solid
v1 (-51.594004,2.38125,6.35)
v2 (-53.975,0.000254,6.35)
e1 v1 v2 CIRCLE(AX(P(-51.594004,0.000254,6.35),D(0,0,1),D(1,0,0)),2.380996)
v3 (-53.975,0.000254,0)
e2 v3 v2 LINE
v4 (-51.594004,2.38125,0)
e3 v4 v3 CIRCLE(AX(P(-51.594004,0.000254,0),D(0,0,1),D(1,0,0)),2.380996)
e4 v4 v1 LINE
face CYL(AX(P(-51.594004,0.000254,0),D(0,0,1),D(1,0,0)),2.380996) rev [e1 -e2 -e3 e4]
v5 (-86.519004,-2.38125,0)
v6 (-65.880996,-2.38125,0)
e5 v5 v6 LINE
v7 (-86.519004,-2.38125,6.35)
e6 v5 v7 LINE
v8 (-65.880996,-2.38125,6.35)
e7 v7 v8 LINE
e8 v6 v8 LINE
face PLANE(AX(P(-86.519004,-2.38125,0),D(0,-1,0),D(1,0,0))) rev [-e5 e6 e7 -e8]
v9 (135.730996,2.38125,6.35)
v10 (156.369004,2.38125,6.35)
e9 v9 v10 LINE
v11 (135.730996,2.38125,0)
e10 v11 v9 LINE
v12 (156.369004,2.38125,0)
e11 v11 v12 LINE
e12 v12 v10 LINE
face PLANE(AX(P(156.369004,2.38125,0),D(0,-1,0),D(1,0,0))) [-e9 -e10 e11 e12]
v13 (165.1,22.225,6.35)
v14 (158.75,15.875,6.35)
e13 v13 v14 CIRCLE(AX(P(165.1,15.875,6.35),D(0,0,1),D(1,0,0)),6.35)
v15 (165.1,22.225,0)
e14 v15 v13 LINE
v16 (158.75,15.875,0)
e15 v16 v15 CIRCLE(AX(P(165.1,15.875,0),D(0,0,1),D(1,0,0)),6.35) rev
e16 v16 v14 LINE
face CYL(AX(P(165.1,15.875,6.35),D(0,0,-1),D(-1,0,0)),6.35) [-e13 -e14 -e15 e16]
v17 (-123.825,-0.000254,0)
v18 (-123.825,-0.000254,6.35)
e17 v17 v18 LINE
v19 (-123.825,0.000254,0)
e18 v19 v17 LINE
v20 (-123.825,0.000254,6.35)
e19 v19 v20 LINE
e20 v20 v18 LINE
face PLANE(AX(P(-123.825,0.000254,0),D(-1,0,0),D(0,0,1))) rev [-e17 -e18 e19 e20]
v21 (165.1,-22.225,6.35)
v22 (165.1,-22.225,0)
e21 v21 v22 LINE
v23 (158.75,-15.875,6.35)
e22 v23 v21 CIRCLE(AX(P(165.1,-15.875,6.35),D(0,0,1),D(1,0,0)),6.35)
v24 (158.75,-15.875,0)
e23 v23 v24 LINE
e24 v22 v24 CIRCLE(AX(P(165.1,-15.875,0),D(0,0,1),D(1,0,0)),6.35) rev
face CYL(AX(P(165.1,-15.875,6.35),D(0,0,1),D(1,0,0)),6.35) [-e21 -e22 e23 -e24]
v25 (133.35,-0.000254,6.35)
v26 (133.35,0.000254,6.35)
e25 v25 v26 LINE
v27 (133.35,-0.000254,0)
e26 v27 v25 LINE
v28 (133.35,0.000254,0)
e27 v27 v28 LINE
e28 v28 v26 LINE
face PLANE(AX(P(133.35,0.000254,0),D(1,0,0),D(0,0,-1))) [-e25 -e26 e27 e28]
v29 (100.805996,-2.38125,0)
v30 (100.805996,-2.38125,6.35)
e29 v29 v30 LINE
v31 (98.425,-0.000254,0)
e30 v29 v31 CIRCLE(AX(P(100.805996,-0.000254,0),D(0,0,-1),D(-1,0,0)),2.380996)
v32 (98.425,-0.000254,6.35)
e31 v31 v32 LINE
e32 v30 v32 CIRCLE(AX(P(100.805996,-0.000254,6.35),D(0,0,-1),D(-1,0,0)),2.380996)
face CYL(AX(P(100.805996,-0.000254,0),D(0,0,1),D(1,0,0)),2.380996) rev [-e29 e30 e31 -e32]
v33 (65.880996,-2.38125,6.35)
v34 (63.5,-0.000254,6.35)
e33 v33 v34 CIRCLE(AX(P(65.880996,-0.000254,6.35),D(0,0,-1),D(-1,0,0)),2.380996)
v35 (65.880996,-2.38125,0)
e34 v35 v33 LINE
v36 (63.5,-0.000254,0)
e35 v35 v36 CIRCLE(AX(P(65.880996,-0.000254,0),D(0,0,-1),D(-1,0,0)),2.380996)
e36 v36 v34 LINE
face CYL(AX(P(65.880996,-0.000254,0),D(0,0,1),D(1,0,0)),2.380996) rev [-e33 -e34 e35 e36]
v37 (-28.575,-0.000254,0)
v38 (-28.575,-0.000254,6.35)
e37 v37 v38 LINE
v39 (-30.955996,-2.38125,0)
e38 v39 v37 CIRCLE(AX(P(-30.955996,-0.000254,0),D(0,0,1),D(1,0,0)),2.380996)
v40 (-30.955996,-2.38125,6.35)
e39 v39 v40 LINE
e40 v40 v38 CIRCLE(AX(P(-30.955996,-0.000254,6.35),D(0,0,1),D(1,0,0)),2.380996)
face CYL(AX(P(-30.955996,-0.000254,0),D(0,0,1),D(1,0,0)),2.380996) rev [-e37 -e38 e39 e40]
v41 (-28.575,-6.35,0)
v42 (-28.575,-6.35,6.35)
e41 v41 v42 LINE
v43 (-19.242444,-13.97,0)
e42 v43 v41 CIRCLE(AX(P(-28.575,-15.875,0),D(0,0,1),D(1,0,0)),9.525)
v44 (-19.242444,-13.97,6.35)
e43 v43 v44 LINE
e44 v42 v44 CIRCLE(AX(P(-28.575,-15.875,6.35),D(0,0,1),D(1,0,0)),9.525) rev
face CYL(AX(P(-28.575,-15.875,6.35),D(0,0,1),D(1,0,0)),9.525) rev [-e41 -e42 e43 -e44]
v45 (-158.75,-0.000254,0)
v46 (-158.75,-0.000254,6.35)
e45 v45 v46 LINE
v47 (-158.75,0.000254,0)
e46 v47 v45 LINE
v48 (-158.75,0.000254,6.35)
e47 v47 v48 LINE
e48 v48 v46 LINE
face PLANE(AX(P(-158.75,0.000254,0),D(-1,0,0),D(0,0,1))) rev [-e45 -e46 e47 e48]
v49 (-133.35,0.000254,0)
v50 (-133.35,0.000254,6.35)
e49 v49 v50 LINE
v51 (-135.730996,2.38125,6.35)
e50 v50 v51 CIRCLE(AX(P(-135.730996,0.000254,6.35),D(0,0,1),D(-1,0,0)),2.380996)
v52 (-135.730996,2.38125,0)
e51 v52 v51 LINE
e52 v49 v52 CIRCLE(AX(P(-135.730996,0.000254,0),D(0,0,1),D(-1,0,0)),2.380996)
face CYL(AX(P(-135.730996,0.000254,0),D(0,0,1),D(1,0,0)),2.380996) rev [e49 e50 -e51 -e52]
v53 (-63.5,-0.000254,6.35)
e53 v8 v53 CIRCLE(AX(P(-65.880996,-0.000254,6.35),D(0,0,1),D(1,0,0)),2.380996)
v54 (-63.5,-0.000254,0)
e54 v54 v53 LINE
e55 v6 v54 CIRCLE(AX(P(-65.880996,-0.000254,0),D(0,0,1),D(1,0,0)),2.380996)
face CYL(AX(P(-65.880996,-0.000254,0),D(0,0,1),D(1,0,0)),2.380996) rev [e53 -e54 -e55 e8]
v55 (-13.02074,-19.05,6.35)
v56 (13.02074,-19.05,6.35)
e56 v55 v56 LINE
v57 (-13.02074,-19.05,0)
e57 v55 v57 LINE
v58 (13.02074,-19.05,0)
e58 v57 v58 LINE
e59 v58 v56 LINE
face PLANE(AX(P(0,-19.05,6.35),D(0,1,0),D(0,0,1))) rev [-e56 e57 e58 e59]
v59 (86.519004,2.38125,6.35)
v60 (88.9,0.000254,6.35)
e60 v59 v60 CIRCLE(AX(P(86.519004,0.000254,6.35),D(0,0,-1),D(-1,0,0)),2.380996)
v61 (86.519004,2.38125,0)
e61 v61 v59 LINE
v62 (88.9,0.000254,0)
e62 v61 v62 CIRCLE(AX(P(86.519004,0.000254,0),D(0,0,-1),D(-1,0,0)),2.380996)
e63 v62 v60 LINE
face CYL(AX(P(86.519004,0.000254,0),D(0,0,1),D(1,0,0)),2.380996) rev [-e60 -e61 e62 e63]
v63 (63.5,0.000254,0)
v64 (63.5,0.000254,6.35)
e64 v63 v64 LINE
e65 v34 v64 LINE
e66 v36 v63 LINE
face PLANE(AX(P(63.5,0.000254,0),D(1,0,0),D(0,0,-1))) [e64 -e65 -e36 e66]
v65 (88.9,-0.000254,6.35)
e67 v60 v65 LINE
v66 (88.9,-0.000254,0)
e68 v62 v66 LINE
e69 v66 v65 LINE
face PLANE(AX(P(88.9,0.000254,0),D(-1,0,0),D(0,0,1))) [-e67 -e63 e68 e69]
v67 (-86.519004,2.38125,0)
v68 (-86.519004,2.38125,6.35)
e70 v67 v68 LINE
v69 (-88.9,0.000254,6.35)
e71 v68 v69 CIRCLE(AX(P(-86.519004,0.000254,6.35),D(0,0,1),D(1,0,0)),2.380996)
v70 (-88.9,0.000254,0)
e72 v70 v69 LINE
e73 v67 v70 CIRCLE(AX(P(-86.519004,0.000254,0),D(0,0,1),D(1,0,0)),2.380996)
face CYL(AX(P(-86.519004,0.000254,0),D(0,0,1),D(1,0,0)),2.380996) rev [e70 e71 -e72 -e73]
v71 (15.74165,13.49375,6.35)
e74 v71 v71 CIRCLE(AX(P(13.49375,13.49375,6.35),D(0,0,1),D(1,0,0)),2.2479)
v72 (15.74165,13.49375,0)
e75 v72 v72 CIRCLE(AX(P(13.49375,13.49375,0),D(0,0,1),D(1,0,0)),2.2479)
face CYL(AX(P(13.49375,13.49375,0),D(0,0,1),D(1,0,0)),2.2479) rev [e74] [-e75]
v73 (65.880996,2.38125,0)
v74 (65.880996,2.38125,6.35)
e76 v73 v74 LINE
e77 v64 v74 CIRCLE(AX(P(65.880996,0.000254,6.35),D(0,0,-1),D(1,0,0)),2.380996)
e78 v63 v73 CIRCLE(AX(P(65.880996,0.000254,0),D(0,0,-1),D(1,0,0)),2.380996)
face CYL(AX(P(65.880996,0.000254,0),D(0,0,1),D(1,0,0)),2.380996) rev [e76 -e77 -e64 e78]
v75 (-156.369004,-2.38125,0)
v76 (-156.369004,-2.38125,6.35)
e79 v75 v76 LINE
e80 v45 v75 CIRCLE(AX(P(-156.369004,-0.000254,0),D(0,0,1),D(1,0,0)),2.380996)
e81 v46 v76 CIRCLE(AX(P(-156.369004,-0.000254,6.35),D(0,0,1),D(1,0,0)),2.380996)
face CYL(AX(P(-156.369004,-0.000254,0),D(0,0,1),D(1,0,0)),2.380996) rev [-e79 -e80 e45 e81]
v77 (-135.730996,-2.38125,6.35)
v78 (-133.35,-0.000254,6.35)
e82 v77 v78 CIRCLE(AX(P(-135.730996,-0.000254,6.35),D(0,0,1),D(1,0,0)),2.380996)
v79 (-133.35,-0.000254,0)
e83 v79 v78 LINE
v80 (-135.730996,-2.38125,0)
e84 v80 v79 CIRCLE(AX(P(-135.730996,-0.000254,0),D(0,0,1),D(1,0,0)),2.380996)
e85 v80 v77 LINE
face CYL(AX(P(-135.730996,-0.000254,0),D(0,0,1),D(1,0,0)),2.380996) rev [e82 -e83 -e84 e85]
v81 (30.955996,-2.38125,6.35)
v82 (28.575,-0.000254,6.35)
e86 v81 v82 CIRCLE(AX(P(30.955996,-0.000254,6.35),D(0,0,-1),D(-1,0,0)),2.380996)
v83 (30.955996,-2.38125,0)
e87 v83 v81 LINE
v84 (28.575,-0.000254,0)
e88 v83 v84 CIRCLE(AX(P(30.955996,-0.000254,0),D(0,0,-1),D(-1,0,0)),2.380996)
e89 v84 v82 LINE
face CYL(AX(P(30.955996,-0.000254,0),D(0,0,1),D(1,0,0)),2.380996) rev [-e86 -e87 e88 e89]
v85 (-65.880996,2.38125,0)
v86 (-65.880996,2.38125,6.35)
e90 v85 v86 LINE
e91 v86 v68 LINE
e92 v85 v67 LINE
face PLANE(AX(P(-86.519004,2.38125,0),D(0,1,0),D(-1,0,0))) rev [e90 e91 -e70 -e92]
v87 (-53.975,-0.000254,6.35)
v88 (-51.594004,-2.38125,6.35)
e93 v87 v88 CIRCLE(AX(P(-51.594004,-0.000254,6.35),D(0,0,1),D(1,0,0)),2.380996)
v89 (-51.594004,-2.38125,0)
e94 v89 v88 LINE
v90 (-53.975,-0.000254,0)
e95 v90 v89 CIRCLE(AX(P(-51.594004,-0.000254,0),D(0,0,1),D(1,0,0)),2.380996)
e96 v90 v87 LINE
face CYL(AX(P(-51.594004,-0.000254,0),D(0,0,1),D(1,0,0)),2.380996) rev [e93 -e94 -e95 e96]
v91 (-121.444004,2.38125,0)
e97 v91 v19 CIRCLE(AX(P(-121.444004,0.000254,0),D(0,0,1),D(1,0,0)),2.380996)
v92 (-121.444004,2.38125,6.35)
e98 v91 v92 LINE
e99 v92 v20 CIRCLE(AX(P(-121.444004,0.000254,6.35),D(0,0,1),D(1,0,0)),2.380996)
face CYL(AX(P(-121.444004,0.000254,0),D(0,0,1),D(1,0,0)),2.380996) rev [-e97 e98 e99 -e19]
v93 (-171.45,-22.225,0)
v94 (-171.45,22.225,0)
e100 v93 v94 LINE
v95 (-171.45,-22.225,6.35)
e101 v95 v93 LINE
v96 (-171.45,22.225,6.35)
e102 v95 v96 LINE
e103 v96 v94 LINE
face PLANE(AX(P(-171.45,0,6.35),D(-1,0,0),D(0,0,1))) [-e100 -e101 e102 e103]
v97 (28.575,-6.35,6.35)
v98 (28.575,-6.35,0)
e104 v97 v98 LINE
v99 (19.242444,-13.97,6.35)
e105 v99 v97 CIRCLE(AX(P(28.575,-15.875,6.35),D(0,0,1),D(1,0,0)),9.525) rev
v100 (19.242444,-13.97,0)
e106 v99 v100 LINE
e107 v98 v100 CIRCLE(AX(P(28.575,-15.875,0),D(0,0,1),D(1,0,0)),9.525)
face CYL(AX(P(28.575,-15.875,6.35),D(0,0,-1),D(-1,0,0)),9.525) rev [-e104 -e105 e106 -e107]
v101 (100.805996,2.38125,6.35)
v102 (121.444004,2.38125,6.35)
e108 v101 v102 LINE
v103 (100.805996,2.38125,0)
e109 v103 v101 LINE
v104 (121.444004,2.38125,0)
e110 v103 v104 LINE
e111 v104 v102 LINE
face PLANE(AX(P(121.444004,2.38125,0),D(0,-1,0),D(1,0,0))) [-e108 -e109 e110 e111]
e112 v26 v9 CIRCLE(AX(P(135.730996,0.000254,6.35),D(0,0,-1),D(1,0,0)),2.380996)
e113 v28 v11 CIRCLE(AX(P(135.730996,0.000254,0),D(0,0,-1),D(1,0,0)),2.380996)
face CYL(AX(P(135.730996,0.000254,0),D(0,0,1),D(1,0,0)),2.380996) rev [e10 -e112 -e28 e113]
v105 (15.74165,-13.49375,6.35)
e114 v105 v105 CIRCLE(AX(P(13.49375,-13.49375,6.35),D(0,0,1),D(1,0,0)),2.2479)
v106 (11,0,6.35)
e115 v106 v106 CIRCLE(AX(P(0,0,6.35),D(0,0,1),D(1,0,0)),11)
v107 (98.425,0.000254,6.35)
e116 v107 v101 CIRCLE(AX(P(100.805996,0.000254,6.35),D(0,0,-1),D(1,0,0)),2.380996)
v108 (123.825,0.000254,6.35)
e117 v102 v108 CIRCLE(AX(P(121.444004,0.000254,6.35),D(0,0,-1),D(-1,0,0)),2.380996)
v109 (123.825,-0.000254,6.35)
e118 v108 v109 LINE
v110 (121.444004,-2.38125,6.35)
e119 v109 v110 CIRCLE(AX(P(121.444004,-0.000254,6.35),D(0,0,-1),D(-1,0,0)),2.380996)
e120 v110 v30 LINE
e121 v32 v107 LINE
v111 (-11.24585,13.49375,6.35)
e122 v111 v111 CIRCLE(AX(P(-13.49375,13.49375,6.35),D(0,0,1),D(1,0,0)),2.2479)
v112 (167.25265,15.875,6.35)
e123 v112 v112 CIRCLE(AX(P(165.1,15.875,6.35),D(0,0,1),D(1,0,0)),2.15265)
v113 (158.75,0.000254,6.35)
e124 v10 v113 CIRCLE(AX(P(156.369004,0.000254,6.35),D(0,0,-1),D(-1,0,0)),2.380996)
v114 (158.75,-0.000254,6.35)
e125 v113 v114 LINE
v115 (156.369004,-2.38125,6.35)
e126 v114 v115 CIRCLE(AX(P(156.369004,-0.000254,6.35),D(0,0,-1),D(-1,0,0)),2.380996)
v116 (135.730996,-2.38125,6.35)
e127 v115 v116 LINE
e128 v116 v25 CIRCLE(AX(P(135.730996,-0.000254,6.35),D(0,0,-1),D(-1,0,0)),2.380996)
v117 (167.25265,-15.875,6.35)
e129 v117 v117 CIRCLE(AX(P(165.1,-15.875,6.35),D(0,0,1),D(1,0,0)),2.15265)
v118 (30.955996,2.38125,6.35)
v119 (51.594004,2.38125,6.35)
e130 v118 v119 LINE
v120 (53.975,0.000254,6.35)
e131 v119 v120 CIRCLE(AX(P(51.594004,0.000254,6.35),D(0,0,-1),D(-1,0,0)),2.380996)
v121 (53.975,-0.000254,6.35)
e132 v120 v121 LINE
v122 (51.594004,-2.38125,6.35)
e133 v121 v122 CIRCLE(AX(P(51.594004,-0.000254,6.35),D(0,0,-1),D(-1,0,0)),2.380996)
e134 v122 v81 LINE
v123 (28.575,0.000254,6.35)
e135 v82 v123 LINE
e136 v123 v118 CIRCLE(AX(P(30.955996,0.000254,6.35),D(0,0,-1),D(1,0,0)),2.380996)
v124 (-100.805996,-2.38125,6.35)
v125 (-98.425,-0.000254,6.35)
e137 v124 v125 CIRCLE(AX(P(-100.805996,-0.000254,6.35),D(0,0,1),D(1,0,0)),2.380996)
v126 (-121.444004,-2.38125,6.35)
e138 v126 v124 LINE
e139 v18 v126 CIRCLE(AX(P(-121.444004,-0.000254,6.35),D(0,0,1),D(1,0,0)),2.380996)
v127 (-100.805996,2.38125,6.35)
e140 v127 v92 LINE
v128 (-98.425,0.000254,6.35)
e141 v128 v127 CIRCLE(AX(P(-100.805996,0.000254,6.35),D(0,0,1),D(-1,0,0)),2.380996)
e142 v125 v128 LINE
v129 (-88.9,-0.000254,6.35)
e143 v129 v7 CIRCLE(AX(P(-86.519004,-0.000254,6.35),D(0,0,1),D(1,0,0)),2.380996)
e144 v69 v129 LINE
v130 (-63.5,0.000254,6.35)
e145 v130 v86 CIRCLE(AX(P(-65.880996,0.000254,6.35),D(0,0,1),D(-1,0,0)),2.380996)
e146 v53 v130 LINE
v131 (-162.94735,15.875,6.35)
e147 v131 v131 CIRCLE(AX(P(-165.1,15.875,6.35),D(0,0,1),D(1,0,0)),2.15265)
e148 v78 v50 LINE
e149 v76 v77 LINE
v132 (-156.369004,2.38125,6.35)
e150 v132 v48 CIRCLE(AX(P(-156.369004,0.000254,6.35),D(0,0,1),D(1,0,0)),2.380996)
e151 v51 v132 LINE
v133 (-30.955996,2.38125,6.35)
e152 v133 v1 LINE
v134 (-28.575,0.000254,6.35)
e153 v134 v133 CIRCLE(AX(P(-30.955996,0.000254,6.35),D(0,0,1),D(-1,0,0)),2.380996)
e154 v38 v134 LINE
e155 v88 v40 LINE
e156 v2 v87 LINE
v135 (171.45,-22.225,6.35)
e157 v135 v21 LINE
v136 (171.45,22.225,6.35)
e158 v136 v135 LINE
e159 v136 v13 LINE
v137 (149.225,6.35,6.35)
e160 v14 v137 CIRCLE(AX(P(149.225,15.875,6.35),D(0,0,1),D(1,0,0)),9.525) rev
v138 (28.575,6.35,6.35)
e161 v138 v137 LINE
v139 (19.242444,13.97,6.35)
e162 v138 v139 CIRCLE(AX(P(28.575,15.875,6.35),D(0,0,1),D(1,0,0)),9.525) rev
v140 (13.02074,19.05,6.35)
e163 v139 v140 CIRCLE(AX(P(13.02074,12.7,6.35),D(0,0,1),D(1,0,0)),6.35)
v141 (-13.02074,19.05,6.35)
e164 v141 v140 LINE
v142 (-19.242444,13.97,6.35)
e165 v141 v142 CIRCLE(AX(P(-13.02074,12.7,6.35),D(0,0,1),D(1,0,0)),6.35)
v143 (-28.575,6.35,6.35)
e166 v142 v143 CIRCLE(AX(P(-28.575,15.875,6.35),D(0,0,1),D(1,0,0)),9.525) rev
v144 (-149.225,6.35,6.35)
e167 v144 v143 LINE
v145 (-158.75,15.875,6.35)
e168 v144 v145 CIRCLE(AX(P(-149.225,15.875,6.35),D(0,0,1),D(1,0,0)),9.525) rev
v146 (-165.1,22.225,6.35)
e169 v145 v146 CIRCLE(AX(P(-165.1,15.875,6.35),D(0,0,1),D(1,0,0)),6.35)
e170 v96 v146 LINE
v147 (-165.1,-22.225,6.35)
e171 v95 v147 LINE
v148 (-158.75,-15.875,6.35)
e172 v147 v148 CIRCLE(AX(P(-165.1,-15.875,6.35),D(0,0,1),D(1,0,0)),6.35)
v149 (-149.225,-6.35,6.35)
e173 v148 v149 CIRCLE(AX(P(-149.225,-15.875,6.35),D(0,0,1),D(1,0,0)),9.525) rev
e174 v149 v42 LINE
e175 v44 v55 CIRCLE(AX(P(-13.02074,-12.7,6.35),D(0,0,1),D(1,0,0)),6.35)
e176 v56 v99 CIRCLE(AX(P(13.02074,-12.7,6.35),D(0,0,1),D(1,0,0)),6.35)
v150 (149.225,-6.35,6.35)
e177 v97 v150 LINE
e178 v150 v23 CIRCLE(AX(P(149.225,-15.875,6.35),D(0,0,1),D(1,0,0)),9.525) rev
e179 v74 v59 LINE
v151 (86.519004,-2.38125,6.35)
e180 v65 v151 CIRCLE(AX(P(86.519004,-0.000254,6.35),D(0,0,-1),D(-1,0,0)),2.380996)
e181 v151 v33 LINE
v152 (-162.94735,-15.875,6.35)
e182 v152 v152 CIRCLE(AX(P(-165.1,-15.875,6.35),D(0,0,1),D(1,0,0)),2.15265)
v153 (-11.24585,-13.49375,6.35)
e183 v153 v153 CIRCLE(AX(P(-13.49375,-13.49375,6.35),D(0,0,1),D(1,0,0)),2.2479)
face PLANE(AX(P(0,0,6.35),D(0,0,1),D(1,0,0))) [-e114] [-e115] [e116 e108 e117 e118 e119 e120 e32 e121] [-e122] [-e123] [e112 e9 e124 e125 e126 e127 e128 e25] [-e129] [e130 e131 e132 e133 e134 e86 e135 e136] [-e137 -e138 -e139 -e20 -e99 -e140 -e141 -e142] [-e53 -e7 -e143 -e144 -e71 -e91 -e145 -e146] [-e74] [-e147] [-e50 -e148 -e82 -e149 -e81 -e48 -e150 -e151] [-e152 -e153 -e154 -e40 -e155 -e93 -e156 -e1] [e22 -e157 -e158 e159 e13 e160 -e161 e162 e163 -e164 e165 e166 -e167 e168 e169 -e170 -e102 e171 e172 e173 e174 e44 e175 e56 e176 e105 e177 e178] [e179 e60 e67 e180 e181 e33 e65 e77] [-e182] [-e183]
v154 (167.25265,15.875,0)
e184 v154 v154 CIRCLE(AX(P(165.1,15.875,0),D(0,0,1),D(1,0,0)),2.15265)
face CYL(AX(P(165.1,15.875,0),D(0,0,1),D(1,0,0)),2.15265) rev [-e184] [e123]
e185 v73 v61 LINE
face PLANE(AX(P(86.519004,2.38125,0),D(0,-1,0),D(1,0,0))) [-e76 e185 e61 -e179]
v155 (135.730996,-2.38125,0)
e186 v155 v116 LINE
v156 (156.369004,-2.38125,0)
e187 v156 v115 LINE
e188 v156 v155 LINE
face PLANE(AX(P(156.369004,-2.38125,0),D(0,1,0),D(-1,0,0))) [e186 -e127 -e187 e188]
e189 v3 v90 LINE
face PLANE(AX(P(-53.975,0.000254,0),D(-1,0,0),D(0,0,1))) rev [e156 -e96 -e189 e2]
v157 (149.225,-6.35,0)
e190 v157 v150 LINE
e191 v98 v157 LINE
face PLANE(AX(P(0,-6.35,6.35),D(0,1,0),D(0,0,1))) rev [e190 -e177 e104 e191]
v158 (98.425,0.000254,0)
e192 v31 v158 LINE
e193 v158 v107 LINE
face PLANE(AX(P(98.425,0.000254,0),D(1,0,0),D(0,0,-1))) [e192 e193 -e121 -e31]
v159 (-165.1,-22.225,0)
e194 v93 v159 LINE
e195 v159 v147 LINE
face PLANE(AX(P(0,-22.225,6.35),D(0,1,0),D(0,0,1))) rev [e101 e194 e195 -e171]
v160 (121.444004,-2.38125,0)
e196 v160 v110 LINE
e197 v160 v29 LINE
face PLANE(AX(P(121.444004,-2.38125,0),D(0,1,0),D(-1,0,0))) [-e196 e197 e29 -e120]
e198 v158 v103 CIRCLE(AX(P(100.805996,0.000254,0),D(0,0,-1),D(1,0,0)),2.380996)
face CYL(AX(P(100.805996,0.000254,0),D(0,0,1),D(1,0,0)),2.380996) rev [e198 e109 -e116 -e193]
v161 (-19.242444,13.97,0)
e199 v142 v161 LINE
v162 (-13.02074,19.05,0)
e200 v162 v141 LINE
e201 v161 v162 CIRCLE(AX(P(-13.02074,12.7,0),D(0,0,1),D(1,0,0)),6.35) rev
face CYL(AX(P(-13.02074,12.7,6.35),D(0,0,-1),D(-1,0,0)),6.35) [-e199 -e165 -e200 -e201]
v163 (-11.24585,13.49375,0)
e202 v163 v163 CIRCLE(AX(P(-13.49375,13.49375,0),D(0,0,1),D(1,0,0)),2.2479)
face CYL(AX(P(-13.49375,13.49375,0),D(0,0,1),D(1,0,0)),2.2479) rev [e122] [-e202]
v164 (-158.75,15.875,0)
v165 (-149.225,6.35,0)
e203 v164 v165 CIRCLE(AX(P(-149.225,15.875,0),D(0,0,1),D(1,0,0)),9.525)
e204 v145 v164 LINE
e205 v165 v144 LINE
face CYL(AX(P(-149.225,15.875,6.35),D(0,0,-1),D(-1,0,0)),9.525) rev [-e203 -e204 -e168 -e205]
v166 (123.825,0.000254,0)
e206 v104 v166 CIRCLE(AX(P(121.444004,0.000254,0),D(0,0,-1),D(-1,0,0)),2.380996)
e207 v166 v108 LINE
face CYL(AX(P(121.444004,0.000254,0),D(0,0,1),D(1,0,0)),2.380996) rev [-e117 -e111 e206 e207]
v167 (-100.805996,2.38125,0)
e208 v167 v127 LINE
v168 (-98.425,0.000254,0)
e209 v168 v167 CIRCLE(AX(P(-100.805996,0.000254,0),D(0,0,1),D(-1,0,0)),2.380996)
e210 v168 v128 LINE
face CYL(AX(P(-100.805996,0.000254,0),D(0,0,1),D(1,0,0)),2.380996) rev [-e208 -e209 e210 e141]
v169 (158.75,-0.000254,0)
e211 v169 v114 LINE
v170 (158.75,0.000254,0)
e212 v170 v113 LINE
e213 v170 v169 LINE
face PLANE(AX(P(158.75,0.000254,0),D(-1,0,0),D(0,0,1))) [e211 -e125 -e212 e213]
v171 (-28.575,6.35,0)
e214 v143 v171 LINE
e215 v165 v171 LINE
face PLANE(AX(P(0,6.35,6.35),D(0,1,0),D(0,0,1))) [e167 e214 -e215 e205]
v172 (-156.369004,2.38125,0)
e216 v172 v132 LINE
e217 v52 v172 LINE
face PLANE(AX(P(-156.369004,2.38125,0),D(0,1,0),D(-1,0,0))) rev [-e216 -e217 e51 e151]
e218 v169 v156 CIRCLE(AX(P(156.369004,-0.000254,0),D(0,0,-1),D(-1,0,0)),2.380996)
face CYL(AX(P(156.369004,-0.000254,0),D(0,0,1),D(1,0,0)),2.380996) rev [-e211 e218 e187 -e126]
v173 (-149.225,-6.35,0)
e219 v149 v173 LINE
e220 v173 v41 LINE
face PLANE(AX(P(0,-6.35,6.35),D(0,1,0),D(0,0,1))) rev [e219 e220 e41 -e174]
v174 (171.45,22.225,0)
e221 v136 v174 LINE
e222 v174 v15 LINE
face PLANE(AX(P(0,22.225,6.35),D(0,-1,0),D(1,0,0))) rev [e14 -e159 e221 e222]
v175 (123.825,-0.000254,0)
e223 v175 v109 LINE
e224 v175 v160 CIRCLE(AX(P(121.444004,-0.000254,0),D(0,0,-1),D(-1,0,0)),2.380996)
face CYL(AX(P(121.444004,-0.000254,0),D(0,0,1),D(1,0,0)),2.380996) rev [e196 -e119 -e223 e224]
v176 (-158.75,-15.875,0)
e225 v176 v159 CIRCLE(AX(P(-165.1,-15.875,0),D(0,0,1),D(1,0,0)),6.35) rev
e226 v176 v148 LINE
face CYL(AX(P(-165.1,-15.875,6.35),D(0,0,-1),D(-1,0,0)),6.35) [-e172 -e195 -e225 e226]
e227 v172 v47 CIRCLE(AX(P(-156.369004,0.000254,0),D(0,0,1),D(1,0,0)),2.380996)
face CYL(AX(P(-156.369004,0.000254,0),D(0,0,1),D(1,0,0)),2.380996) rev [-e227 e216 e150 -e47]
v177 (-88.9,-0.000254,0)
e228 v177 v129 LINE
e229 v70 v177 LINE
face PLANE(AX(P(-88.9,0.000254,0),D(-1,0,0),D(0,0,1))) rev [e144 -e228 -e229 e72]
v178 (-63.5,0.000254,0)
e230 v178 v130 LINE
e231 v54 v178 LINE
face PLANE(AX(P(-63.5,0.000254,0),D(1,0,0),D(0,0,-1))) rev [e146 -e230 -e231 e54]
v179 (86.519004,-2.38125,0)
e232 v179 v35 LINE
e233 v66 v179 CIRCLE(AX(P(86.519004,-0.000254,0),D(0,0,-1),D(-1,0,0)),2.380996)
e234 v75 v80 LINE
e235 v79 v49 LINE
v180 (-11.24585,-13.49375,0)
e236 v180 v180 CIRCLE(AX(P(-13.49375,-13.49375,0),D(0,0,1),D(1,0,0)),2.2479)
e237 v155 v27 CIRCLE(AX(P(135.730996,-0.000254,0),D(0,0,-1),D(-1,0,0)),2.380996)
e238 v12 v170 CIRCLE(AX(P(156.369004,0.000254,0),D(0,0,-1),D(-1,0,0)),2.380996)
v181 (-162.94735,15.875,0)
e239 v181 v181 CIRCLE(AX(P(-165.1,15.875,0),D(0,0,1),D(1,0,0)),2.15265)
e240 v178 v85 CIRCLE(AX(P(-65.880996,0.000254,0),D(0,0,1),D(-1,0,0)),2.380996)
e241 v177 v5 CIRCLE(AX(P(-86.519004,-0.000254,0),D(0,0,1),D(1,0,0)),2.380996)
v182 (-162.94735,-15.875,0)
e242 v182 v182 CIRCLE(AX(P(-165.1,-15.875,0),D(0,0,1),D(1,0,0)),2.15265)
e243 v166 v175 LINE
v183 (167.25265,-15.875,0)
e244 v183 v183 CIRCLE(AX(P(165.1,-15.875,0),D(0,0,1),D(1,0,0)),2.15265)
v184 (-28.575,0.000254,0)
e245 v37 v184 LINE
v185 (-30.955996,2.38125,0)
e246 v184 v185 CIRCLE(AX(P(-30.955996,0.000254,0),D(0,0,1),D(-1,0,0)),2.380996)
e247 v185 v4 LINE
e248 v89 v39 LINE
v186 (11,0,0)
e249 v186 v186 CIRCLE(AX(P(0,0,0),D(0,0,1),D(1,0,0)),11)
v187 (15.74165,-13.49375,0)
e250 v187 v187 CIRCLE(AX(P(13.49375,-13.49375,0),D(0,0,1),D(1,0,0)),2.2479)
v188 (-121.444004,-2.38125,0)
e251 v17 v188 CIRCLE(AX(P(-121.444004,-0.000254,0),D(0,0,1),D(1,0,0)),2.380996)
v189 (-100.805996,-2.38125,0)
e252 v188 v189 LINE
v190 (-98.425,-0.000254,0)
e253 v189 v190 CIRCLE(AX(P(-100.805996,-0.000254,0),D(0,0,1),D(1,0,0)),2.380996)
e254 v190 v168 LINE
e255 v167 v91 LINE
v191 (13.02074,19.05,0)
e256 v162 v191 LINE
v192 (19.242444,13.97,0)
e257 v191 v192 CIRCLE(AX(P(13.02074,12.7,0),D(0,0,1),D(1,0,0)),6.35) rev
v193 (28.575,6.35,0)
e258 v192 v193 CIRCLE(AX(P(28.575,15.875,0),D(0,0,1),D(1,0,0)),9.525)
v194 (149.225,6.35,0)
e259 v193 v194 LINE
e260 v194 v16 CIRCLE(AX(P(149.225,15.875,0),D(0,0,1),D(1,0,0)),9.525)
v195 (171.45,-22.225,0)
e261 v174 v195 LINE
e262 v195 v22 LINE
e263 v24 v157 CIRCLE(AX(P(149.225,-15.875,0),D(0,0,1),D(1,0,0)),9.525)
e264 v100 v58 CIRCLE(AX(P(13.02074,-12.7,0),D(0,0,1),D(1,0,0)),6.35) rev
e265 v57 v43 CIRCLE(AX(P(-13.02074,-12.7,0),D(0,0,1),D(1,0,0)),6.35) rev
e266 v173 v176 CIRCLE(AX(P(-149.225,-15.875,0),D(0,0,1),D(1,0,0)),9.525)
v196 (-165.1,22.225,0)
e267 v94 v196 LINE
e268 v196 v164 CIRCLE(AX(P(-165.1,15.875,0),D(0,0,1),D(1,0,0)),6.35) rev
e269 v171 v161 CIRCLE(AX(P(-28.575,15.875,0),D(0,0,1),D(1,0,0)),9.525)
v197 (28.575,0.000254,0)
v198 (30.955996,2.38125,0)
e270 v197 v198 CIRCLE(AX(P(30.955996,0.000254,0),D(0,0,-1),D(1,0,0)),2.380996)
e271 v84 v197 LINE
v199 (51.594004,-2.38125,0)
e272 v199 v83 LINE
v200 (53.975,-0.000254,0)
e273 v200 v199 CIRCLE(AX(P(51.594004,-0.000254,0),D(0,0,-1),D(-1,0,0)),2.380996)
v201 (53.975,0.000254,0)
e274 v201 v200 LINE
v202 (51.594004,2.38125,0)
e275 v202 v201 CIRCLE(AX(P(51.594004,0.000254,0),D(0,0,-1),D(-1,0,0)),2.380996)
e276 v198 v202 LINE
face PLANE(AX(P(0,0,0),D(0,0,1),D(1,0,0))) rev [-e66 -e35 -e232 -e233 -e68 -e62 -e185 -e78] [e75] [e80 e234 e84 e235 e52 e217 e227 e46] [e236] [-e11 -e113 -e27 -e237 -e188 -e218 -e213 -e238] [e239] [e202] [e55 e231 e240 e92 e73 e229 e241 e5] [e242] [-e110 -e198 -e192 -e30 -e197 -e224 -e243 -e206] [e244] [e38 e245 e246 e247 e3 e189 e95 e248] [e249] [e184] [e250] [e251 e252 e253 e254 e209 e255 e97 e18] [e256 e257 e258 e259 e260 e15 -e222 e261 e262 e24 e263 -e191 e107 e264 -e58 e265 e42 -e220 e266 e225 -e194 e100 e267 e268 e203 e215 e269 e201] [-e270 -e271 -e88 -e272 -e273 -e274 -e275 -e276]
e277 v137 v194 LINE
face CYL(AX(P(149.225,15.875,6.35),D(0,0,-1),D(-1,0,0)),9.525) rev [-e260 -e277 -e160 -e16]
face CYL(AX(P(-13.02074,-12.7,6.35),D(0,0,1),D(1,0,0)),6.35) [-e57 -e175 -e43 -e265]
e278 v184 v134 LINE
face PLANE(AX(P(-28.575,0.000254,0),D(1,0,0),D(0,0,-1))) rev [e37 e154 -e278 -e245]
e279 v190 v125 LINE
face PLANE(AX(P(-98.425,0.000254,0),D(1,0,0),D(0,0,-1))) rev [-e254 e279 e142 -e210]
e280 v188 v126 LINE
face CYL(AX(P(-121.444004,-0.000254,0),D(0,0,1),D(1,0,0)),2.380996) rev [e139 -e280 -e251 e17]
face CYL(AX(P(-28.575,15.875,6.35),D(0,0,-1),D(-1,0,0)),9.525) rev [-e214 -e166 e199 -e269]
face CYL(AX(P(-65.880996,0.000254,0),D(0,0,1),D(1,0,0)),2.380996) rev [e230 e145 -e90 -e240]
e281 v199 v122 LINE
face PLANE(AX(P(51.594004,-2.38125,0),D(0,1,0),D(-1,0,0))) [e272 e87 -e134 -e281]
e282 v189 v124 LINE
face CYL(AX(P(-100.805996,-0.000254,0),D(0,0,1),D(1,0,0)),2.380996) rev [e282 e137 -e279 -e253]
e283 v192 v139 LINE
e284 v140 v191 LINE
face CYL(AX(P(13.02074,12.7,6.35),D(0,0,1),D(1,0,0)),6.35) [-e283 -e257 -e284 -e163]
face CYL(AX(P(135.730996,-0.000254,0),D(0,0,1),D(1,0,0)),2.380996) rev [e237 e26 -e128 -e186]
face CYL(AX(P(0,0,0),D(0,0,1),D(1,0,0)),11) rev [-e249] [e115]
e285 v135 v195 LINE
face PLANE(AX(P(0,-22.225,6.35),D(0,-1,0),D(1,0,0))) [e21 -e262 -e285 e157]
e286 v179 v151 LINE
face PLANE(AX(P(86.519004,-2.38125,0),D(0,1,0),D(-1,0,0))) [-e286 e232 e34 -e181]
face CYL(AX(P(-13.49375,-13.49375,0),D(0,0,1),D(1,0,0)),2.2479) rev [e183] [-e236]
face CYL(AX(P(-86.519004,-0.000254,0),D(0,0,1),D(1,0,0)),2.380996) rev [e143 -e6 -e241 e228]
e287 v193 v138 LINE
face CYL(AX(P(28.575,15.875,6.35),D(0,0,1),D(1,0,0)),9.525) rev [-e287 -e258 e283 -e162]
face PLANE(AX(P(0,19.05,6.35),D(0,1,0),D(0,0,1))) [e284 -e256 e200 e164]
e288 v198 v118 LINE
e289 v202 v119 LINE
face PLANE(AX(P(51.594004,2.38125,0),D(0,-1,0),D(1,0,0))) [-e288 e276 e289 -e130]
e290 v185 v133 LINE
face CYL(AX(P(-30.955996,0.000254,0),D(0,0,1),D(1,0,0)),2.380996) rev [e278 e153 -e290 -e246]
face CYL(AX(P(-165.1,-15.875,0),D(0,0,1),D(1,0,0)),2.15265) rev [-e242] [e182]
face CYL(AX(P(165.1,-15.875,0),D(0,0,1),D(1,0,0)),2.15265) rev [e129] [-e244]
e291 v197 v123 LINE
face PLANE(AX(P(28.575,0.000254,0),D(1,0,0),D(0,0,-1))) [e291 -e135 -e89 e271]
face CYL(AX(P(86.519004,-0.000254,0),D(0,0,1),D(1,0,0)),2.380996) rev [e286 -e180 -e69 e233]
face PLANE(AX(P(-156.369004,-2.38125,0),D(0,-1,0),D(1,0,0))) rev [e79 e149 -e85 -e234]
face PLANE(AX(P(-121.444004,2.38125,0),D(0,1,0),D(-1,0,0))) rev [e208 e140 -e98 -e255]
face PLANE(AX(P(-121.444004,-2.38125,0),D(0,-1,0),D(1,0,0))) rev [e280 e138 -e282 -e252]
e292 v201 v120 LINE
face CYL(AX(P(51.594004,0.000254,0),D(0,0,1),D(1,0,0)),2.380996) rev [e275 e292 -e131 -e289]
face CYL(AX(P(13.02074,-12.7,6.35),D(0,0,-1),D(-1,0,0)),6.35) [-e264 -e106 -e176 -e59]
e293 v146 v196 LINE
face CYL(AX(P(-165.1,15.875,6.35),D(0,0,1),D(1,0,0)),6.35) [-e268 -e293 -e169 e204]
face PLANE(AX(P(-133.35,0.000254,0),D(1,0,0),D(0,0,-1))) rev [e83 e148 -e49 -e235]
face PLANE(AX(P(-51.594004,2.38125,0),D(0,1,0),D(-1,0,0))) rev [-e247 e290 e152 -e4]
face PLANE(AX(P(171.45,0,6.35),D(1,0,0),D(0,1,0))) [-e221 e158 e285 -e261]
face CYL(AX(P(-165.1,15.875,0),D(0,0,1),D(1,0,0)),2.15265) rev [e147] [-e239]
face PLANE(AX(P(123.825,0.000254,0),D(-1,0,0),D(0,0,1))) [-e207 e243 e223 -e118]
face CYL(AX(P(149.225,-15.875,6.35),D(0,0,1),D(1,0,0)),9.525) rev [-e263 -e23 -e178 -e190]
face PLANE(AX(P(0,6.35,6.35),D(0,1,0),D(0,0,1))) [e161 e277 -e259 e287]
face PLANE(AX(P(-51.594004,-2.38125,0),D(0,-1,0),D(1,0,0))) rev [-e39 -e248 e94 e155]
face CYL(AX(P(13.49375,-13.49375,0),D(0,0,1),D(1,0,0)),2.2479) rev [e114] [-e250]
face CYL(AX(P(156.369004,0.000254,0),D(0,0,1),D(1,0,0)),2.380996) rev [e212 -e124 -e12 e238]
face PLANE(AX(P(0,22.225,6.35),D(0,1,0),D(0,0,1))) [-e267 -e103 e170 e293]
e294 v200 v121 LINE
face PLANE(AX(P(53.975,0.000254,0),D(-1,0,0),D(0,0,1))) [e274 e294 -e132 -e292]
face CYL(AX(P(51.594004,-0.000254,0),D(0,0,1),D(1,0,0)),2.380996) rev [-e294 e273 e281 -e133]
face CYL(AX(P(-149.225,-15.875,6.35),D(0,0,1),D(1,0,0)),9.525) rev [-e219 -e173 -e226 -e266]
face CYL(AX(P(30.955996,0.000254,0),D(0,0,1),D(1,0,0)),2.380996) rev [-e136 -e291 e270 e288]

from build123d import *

# Parameters (mm, degrees)
SKETCH4_W            = 139.7
SKETCH4_H            = 12.7
SKETCH4_W_2          = 38.1
BOSS_EXTRUDE2_DEPTH  = 6.35
FILLET4_R            = 9.525
FILLET5_R            = 6.35
SKETCH5_R            = 11
SKETCH5_R_2          = 2.15265
CUT_EXTRUDE1_DEPTH   = 6.35
SKETCH6_R            = 2.2479
CUT_EXTRUDE2_DEPTH   = 6.35
CUT_EXTRUDE3_DEPTH   = 6.35
LPATTERN1_COUNT      = 4
LPATTERN1_PITCH      = 34.925
MIRROR1_COPY_1_DEPTH = 6.35
MIRROR1_COPY_2_DEPTH = 6.35
MIRROR1_COPY_3_DEPTH = 6.35


with BuildPart() as part:
    # Sketch4 → Boss-Extrude2 (new body)
    with BuildSketch(Plane.XY):
        Polygon((-158.75, -22.225), (-158.75, -6.35), (-158.75, 6.35), (-158.75, 22.225), (-171.45, 22.225), (-171.45, -22.225), align=None)
        with Locations((-88.9, 0)):
            Rectangle(SKETCH4_W, SKETCH4_H)
        with Locations((0, 12.7)):
            Rectangle(SKETCH4_W_2, SKETCH4_H)
        Rectangle(SKETCH4_W_2, SKETCH4_H)
        with Locations((0, -12.7)):
            Rectangle(SKETCH4_W_2, SKETCH4_H)
        with Locations((88.9, 0)):
            Rectangle(SKETCH4_W, SKETCH4_H)
        Polygon((158.75, 6.35), (158.75, -6.35), (158.75, -22.225), (171.45, -22.225), (171.45, 22.225), (158.75, 22.225), align=None)
    extrude(amount=BOSS_EXTRUDE2_DEPTH)

    # Fillet4
    fillet4_edges = [part.edges().sort_by_distance(p)[0] for p in [
        (-158.75, 6.35, 3.175),
        (-19.05, 6.35, 3.175),
        (19.05, 6.35, 3.175),
        (158.75, 6.35, 3.175),
        (158.75, -6.35, 3.175),
        (19.05, -6.35, 3.175),
        (-19.05, -6.35, 3.175),
        (-158.75, -6.35, 3.175),
    ]]
    fillet(fillet4_edges, radius=FILLET4_R)

    # Fillet5
    fillet5_edges = [part.edges().sort_by_distance(p)[0] for p in [
        (-158.75, 22.225, 3.175),
        (-158.75, -22.225, 3.175),
        (158.75, -22.225, 3.175),
        (158.75, 22.225, 3.175),
        (19.05, 19.05, 3.175),
        (-19.05, 19.05, 3.175),
        (-19.05, -19.05, 3.175),
        (19.05, -19.05, 3.175),
    ]]
    fillet(fillet5_edges, radius=FILLET5_R - 0.0001)  # a hair under: the kernel refuses the full size

    # Sketch5 → Cut-Extrude1 (cut)
    with BuildSketch(Plane.XY.offset(6.35)):
        Circle(SKETCH5_R)
        with Locations((-165.1, 15.875)):
            Circle(SKETCH5_R_2)
        with Locations((-165.1, -15.875)):
            Circle(SKETCH5_R_2)
        with Locations((165.1, 15.875)):
            Circle(SKETCH5_R_2)
        with Locations((165.1, -15.875)):
            Circle(SKETCH5_R_2)
    extrude(amount=-CUT_EXTRUDE1_DEPTH, mode=Mode.SUBTRACT)

    # Sketch6 → Cut-Extrude2 (cut)
    with BuildSketch(Plane.XY.offset(6.35)):
        with Locations((-13.49375, -13.49375)):
            Circle(SKETCH6_R)
        with Locations((13.49375, -13.49375)):
            Circle(SKETCH6_R)
        with Locations((13.49375, 13.49375)):
            Circle(SKETCH6_R)
        with Locations((-13.49375, 13.49375)):
            Circle(SKETCH6_R)
    extrude(amount=-CUT_EXTRUDE2_DEPTH, mode=Mode.SUBTRACT)

    # Sketch7 → Cut-Extrude3 (cut)
    with BuildSketch(Plane.XY.offset(6.35)):
        with BuildLine():
            Line((-156.369004, 2.38125), (-135.730996005, 2.38125))
            ThreePointArc((-135.730996005, 2.38125), (-134.047377588, 1.683872418), (-133.350000005, 0.000254))
            ThreePointArc((-133.350000005, 0.000254), (-134.047377588, -1.683872418), (-135.730996005, -2.38125))
            Line((-135.730996005, -2.38125), (-156.369004, -2.38125))
            ThreePointArc((-156.369004, -2.38125), (-158.052622418, -1.683872418), (-158.75, 0.000254))
            ThreePointArc((-158.75, 0.000254), (-158.052622418, 1.683872418), (-156.369004, 2.38125))
        make_face()
    cut_extrude3 = extrude(amount=-CUT_EXTRUDE3_DEPTH, mode=Mode.SUBTRACT)

    # LPattern1: Cut-Extrude3 ×4
    with Locations(*[(i * LPATTERN1_PITCH, 0, 0) for i in range(1, LPATTERN1_COUNT)]):
        add(cut_extrude3, mode=Mode.SUBTRACT)

    # Mirror1: Cut-Extrude3 across plane
    add(cut_extrude3.mirror(Plane(origin=(0, 0, 0), x_dir=(0, 0, 1), z_dir=(1, 0, 0))), mode=Mode.SUBTRACT)

    # Mirror1 copy 1 sketch → Mirror1 copy 1 (cut)
    with BuildSketch(Plane(origin=(-34.925, 0, 6.35), x_dir=(-1, 0, 0), z_dir=(0, 0, 1))):
        with BuildLine():
            Line((-156.369004, -2.38125), (-135.730996005, -2.38125))
            ThreePointArc((-135.730996005, -2.38125), (-134.047377588, -1.683872418), (-133.350000005, -0.000254))
            ThreePointArc((-133.350000005, -0.000254), (-134.047377588, 1.683872418), (-135.730996005, 2.38125))
            Line((-135.730996005, 2.38125), (-156.369004, 2.38125))
            ThreePointArc((-156.369004, 2.38125), (-158.052622418, 1.683872418), (-158.75, -0.000254))
            ThreePointArc((-158.75, -0.000254), (-158.052622418, -1.683872418), (-156.369004, -2.38125))
        make_face()
    extrude(amount=-MIRROR1_COPY_1_DEPTH, mode=Mode.SUBTRACT)

    # Mirror1 copy 2 sketch → Mirror1 copy 2 (cut)
    with BuildSketch(Plane(origin=(-69.85, 0, 6.35), x_dir=(-1, 0, 0), z_dir=(0, 0, 1))):
        with BuildLine():
            Line((-156.369004, -2.38125), (-135.730996005, -2.38125))
            ThreePointArc((-135.730996005, -2.38125), (-134.047377588, -1.683872418), (-133.350000005, -0.000254))
            ThreePointArc((-133.350000005, -0.000254), (-134.047377588, 1.683872418), (-135.730996005, 2.38125))
            Line((-135.730996005, 2.38125), (-156.369004, 2.38125))
            ThreePointArc((-156.369004, 2.38125), (-158.052622418, 1.683872418), (-158.75, -0.000254))
            ThreePointArc((-158.75, -0.000254), (-158.052622418, -1.683872418), (-156.369004, -2.38125))
        make_face()
    extrude(amount=-MIRROR1_COPY_2_DEPTH, mode=Mode.SUBTRACT)

    # Mirror1 copy 3 sketch → Mirror1 copy 3 (cut)
    with BuildSketch(Plane(origin=(-104.775, 0, 6.35), x_dir=(-1, 0, 0), z_dir=(0, 0, 1))):
        with BuildLine():
            Line((-156.369004, -2.38125), (-135.730996005, -2.38125))
            ThreePointArc((-135.730996005, -2.38125), (-134.047377588, -1.683872418), (-133.350000005, -0.000254))
            ThreePointArc((-133.350000005, -0.000254), (-134.047377588, 1.683872418), (-135.730996005, 2.38125))
            Line((-135.730996005, 2.38125), (-156.369004, 2.38125))
            ThreePointArc((-156.369004, 2.38125), (-158.052622418, 1.683872418), (-158.75, -0.000254))
            ThreePointArc((-158.75, -0.000254), (-158.052622418, -1.683872418), (-156.369004, -2.38125))
        make_face()
    extrude(amount=-MIRROR1_COPY_3_DEPTH, mode=Mode.SUBTRACT)


solid = part.part
